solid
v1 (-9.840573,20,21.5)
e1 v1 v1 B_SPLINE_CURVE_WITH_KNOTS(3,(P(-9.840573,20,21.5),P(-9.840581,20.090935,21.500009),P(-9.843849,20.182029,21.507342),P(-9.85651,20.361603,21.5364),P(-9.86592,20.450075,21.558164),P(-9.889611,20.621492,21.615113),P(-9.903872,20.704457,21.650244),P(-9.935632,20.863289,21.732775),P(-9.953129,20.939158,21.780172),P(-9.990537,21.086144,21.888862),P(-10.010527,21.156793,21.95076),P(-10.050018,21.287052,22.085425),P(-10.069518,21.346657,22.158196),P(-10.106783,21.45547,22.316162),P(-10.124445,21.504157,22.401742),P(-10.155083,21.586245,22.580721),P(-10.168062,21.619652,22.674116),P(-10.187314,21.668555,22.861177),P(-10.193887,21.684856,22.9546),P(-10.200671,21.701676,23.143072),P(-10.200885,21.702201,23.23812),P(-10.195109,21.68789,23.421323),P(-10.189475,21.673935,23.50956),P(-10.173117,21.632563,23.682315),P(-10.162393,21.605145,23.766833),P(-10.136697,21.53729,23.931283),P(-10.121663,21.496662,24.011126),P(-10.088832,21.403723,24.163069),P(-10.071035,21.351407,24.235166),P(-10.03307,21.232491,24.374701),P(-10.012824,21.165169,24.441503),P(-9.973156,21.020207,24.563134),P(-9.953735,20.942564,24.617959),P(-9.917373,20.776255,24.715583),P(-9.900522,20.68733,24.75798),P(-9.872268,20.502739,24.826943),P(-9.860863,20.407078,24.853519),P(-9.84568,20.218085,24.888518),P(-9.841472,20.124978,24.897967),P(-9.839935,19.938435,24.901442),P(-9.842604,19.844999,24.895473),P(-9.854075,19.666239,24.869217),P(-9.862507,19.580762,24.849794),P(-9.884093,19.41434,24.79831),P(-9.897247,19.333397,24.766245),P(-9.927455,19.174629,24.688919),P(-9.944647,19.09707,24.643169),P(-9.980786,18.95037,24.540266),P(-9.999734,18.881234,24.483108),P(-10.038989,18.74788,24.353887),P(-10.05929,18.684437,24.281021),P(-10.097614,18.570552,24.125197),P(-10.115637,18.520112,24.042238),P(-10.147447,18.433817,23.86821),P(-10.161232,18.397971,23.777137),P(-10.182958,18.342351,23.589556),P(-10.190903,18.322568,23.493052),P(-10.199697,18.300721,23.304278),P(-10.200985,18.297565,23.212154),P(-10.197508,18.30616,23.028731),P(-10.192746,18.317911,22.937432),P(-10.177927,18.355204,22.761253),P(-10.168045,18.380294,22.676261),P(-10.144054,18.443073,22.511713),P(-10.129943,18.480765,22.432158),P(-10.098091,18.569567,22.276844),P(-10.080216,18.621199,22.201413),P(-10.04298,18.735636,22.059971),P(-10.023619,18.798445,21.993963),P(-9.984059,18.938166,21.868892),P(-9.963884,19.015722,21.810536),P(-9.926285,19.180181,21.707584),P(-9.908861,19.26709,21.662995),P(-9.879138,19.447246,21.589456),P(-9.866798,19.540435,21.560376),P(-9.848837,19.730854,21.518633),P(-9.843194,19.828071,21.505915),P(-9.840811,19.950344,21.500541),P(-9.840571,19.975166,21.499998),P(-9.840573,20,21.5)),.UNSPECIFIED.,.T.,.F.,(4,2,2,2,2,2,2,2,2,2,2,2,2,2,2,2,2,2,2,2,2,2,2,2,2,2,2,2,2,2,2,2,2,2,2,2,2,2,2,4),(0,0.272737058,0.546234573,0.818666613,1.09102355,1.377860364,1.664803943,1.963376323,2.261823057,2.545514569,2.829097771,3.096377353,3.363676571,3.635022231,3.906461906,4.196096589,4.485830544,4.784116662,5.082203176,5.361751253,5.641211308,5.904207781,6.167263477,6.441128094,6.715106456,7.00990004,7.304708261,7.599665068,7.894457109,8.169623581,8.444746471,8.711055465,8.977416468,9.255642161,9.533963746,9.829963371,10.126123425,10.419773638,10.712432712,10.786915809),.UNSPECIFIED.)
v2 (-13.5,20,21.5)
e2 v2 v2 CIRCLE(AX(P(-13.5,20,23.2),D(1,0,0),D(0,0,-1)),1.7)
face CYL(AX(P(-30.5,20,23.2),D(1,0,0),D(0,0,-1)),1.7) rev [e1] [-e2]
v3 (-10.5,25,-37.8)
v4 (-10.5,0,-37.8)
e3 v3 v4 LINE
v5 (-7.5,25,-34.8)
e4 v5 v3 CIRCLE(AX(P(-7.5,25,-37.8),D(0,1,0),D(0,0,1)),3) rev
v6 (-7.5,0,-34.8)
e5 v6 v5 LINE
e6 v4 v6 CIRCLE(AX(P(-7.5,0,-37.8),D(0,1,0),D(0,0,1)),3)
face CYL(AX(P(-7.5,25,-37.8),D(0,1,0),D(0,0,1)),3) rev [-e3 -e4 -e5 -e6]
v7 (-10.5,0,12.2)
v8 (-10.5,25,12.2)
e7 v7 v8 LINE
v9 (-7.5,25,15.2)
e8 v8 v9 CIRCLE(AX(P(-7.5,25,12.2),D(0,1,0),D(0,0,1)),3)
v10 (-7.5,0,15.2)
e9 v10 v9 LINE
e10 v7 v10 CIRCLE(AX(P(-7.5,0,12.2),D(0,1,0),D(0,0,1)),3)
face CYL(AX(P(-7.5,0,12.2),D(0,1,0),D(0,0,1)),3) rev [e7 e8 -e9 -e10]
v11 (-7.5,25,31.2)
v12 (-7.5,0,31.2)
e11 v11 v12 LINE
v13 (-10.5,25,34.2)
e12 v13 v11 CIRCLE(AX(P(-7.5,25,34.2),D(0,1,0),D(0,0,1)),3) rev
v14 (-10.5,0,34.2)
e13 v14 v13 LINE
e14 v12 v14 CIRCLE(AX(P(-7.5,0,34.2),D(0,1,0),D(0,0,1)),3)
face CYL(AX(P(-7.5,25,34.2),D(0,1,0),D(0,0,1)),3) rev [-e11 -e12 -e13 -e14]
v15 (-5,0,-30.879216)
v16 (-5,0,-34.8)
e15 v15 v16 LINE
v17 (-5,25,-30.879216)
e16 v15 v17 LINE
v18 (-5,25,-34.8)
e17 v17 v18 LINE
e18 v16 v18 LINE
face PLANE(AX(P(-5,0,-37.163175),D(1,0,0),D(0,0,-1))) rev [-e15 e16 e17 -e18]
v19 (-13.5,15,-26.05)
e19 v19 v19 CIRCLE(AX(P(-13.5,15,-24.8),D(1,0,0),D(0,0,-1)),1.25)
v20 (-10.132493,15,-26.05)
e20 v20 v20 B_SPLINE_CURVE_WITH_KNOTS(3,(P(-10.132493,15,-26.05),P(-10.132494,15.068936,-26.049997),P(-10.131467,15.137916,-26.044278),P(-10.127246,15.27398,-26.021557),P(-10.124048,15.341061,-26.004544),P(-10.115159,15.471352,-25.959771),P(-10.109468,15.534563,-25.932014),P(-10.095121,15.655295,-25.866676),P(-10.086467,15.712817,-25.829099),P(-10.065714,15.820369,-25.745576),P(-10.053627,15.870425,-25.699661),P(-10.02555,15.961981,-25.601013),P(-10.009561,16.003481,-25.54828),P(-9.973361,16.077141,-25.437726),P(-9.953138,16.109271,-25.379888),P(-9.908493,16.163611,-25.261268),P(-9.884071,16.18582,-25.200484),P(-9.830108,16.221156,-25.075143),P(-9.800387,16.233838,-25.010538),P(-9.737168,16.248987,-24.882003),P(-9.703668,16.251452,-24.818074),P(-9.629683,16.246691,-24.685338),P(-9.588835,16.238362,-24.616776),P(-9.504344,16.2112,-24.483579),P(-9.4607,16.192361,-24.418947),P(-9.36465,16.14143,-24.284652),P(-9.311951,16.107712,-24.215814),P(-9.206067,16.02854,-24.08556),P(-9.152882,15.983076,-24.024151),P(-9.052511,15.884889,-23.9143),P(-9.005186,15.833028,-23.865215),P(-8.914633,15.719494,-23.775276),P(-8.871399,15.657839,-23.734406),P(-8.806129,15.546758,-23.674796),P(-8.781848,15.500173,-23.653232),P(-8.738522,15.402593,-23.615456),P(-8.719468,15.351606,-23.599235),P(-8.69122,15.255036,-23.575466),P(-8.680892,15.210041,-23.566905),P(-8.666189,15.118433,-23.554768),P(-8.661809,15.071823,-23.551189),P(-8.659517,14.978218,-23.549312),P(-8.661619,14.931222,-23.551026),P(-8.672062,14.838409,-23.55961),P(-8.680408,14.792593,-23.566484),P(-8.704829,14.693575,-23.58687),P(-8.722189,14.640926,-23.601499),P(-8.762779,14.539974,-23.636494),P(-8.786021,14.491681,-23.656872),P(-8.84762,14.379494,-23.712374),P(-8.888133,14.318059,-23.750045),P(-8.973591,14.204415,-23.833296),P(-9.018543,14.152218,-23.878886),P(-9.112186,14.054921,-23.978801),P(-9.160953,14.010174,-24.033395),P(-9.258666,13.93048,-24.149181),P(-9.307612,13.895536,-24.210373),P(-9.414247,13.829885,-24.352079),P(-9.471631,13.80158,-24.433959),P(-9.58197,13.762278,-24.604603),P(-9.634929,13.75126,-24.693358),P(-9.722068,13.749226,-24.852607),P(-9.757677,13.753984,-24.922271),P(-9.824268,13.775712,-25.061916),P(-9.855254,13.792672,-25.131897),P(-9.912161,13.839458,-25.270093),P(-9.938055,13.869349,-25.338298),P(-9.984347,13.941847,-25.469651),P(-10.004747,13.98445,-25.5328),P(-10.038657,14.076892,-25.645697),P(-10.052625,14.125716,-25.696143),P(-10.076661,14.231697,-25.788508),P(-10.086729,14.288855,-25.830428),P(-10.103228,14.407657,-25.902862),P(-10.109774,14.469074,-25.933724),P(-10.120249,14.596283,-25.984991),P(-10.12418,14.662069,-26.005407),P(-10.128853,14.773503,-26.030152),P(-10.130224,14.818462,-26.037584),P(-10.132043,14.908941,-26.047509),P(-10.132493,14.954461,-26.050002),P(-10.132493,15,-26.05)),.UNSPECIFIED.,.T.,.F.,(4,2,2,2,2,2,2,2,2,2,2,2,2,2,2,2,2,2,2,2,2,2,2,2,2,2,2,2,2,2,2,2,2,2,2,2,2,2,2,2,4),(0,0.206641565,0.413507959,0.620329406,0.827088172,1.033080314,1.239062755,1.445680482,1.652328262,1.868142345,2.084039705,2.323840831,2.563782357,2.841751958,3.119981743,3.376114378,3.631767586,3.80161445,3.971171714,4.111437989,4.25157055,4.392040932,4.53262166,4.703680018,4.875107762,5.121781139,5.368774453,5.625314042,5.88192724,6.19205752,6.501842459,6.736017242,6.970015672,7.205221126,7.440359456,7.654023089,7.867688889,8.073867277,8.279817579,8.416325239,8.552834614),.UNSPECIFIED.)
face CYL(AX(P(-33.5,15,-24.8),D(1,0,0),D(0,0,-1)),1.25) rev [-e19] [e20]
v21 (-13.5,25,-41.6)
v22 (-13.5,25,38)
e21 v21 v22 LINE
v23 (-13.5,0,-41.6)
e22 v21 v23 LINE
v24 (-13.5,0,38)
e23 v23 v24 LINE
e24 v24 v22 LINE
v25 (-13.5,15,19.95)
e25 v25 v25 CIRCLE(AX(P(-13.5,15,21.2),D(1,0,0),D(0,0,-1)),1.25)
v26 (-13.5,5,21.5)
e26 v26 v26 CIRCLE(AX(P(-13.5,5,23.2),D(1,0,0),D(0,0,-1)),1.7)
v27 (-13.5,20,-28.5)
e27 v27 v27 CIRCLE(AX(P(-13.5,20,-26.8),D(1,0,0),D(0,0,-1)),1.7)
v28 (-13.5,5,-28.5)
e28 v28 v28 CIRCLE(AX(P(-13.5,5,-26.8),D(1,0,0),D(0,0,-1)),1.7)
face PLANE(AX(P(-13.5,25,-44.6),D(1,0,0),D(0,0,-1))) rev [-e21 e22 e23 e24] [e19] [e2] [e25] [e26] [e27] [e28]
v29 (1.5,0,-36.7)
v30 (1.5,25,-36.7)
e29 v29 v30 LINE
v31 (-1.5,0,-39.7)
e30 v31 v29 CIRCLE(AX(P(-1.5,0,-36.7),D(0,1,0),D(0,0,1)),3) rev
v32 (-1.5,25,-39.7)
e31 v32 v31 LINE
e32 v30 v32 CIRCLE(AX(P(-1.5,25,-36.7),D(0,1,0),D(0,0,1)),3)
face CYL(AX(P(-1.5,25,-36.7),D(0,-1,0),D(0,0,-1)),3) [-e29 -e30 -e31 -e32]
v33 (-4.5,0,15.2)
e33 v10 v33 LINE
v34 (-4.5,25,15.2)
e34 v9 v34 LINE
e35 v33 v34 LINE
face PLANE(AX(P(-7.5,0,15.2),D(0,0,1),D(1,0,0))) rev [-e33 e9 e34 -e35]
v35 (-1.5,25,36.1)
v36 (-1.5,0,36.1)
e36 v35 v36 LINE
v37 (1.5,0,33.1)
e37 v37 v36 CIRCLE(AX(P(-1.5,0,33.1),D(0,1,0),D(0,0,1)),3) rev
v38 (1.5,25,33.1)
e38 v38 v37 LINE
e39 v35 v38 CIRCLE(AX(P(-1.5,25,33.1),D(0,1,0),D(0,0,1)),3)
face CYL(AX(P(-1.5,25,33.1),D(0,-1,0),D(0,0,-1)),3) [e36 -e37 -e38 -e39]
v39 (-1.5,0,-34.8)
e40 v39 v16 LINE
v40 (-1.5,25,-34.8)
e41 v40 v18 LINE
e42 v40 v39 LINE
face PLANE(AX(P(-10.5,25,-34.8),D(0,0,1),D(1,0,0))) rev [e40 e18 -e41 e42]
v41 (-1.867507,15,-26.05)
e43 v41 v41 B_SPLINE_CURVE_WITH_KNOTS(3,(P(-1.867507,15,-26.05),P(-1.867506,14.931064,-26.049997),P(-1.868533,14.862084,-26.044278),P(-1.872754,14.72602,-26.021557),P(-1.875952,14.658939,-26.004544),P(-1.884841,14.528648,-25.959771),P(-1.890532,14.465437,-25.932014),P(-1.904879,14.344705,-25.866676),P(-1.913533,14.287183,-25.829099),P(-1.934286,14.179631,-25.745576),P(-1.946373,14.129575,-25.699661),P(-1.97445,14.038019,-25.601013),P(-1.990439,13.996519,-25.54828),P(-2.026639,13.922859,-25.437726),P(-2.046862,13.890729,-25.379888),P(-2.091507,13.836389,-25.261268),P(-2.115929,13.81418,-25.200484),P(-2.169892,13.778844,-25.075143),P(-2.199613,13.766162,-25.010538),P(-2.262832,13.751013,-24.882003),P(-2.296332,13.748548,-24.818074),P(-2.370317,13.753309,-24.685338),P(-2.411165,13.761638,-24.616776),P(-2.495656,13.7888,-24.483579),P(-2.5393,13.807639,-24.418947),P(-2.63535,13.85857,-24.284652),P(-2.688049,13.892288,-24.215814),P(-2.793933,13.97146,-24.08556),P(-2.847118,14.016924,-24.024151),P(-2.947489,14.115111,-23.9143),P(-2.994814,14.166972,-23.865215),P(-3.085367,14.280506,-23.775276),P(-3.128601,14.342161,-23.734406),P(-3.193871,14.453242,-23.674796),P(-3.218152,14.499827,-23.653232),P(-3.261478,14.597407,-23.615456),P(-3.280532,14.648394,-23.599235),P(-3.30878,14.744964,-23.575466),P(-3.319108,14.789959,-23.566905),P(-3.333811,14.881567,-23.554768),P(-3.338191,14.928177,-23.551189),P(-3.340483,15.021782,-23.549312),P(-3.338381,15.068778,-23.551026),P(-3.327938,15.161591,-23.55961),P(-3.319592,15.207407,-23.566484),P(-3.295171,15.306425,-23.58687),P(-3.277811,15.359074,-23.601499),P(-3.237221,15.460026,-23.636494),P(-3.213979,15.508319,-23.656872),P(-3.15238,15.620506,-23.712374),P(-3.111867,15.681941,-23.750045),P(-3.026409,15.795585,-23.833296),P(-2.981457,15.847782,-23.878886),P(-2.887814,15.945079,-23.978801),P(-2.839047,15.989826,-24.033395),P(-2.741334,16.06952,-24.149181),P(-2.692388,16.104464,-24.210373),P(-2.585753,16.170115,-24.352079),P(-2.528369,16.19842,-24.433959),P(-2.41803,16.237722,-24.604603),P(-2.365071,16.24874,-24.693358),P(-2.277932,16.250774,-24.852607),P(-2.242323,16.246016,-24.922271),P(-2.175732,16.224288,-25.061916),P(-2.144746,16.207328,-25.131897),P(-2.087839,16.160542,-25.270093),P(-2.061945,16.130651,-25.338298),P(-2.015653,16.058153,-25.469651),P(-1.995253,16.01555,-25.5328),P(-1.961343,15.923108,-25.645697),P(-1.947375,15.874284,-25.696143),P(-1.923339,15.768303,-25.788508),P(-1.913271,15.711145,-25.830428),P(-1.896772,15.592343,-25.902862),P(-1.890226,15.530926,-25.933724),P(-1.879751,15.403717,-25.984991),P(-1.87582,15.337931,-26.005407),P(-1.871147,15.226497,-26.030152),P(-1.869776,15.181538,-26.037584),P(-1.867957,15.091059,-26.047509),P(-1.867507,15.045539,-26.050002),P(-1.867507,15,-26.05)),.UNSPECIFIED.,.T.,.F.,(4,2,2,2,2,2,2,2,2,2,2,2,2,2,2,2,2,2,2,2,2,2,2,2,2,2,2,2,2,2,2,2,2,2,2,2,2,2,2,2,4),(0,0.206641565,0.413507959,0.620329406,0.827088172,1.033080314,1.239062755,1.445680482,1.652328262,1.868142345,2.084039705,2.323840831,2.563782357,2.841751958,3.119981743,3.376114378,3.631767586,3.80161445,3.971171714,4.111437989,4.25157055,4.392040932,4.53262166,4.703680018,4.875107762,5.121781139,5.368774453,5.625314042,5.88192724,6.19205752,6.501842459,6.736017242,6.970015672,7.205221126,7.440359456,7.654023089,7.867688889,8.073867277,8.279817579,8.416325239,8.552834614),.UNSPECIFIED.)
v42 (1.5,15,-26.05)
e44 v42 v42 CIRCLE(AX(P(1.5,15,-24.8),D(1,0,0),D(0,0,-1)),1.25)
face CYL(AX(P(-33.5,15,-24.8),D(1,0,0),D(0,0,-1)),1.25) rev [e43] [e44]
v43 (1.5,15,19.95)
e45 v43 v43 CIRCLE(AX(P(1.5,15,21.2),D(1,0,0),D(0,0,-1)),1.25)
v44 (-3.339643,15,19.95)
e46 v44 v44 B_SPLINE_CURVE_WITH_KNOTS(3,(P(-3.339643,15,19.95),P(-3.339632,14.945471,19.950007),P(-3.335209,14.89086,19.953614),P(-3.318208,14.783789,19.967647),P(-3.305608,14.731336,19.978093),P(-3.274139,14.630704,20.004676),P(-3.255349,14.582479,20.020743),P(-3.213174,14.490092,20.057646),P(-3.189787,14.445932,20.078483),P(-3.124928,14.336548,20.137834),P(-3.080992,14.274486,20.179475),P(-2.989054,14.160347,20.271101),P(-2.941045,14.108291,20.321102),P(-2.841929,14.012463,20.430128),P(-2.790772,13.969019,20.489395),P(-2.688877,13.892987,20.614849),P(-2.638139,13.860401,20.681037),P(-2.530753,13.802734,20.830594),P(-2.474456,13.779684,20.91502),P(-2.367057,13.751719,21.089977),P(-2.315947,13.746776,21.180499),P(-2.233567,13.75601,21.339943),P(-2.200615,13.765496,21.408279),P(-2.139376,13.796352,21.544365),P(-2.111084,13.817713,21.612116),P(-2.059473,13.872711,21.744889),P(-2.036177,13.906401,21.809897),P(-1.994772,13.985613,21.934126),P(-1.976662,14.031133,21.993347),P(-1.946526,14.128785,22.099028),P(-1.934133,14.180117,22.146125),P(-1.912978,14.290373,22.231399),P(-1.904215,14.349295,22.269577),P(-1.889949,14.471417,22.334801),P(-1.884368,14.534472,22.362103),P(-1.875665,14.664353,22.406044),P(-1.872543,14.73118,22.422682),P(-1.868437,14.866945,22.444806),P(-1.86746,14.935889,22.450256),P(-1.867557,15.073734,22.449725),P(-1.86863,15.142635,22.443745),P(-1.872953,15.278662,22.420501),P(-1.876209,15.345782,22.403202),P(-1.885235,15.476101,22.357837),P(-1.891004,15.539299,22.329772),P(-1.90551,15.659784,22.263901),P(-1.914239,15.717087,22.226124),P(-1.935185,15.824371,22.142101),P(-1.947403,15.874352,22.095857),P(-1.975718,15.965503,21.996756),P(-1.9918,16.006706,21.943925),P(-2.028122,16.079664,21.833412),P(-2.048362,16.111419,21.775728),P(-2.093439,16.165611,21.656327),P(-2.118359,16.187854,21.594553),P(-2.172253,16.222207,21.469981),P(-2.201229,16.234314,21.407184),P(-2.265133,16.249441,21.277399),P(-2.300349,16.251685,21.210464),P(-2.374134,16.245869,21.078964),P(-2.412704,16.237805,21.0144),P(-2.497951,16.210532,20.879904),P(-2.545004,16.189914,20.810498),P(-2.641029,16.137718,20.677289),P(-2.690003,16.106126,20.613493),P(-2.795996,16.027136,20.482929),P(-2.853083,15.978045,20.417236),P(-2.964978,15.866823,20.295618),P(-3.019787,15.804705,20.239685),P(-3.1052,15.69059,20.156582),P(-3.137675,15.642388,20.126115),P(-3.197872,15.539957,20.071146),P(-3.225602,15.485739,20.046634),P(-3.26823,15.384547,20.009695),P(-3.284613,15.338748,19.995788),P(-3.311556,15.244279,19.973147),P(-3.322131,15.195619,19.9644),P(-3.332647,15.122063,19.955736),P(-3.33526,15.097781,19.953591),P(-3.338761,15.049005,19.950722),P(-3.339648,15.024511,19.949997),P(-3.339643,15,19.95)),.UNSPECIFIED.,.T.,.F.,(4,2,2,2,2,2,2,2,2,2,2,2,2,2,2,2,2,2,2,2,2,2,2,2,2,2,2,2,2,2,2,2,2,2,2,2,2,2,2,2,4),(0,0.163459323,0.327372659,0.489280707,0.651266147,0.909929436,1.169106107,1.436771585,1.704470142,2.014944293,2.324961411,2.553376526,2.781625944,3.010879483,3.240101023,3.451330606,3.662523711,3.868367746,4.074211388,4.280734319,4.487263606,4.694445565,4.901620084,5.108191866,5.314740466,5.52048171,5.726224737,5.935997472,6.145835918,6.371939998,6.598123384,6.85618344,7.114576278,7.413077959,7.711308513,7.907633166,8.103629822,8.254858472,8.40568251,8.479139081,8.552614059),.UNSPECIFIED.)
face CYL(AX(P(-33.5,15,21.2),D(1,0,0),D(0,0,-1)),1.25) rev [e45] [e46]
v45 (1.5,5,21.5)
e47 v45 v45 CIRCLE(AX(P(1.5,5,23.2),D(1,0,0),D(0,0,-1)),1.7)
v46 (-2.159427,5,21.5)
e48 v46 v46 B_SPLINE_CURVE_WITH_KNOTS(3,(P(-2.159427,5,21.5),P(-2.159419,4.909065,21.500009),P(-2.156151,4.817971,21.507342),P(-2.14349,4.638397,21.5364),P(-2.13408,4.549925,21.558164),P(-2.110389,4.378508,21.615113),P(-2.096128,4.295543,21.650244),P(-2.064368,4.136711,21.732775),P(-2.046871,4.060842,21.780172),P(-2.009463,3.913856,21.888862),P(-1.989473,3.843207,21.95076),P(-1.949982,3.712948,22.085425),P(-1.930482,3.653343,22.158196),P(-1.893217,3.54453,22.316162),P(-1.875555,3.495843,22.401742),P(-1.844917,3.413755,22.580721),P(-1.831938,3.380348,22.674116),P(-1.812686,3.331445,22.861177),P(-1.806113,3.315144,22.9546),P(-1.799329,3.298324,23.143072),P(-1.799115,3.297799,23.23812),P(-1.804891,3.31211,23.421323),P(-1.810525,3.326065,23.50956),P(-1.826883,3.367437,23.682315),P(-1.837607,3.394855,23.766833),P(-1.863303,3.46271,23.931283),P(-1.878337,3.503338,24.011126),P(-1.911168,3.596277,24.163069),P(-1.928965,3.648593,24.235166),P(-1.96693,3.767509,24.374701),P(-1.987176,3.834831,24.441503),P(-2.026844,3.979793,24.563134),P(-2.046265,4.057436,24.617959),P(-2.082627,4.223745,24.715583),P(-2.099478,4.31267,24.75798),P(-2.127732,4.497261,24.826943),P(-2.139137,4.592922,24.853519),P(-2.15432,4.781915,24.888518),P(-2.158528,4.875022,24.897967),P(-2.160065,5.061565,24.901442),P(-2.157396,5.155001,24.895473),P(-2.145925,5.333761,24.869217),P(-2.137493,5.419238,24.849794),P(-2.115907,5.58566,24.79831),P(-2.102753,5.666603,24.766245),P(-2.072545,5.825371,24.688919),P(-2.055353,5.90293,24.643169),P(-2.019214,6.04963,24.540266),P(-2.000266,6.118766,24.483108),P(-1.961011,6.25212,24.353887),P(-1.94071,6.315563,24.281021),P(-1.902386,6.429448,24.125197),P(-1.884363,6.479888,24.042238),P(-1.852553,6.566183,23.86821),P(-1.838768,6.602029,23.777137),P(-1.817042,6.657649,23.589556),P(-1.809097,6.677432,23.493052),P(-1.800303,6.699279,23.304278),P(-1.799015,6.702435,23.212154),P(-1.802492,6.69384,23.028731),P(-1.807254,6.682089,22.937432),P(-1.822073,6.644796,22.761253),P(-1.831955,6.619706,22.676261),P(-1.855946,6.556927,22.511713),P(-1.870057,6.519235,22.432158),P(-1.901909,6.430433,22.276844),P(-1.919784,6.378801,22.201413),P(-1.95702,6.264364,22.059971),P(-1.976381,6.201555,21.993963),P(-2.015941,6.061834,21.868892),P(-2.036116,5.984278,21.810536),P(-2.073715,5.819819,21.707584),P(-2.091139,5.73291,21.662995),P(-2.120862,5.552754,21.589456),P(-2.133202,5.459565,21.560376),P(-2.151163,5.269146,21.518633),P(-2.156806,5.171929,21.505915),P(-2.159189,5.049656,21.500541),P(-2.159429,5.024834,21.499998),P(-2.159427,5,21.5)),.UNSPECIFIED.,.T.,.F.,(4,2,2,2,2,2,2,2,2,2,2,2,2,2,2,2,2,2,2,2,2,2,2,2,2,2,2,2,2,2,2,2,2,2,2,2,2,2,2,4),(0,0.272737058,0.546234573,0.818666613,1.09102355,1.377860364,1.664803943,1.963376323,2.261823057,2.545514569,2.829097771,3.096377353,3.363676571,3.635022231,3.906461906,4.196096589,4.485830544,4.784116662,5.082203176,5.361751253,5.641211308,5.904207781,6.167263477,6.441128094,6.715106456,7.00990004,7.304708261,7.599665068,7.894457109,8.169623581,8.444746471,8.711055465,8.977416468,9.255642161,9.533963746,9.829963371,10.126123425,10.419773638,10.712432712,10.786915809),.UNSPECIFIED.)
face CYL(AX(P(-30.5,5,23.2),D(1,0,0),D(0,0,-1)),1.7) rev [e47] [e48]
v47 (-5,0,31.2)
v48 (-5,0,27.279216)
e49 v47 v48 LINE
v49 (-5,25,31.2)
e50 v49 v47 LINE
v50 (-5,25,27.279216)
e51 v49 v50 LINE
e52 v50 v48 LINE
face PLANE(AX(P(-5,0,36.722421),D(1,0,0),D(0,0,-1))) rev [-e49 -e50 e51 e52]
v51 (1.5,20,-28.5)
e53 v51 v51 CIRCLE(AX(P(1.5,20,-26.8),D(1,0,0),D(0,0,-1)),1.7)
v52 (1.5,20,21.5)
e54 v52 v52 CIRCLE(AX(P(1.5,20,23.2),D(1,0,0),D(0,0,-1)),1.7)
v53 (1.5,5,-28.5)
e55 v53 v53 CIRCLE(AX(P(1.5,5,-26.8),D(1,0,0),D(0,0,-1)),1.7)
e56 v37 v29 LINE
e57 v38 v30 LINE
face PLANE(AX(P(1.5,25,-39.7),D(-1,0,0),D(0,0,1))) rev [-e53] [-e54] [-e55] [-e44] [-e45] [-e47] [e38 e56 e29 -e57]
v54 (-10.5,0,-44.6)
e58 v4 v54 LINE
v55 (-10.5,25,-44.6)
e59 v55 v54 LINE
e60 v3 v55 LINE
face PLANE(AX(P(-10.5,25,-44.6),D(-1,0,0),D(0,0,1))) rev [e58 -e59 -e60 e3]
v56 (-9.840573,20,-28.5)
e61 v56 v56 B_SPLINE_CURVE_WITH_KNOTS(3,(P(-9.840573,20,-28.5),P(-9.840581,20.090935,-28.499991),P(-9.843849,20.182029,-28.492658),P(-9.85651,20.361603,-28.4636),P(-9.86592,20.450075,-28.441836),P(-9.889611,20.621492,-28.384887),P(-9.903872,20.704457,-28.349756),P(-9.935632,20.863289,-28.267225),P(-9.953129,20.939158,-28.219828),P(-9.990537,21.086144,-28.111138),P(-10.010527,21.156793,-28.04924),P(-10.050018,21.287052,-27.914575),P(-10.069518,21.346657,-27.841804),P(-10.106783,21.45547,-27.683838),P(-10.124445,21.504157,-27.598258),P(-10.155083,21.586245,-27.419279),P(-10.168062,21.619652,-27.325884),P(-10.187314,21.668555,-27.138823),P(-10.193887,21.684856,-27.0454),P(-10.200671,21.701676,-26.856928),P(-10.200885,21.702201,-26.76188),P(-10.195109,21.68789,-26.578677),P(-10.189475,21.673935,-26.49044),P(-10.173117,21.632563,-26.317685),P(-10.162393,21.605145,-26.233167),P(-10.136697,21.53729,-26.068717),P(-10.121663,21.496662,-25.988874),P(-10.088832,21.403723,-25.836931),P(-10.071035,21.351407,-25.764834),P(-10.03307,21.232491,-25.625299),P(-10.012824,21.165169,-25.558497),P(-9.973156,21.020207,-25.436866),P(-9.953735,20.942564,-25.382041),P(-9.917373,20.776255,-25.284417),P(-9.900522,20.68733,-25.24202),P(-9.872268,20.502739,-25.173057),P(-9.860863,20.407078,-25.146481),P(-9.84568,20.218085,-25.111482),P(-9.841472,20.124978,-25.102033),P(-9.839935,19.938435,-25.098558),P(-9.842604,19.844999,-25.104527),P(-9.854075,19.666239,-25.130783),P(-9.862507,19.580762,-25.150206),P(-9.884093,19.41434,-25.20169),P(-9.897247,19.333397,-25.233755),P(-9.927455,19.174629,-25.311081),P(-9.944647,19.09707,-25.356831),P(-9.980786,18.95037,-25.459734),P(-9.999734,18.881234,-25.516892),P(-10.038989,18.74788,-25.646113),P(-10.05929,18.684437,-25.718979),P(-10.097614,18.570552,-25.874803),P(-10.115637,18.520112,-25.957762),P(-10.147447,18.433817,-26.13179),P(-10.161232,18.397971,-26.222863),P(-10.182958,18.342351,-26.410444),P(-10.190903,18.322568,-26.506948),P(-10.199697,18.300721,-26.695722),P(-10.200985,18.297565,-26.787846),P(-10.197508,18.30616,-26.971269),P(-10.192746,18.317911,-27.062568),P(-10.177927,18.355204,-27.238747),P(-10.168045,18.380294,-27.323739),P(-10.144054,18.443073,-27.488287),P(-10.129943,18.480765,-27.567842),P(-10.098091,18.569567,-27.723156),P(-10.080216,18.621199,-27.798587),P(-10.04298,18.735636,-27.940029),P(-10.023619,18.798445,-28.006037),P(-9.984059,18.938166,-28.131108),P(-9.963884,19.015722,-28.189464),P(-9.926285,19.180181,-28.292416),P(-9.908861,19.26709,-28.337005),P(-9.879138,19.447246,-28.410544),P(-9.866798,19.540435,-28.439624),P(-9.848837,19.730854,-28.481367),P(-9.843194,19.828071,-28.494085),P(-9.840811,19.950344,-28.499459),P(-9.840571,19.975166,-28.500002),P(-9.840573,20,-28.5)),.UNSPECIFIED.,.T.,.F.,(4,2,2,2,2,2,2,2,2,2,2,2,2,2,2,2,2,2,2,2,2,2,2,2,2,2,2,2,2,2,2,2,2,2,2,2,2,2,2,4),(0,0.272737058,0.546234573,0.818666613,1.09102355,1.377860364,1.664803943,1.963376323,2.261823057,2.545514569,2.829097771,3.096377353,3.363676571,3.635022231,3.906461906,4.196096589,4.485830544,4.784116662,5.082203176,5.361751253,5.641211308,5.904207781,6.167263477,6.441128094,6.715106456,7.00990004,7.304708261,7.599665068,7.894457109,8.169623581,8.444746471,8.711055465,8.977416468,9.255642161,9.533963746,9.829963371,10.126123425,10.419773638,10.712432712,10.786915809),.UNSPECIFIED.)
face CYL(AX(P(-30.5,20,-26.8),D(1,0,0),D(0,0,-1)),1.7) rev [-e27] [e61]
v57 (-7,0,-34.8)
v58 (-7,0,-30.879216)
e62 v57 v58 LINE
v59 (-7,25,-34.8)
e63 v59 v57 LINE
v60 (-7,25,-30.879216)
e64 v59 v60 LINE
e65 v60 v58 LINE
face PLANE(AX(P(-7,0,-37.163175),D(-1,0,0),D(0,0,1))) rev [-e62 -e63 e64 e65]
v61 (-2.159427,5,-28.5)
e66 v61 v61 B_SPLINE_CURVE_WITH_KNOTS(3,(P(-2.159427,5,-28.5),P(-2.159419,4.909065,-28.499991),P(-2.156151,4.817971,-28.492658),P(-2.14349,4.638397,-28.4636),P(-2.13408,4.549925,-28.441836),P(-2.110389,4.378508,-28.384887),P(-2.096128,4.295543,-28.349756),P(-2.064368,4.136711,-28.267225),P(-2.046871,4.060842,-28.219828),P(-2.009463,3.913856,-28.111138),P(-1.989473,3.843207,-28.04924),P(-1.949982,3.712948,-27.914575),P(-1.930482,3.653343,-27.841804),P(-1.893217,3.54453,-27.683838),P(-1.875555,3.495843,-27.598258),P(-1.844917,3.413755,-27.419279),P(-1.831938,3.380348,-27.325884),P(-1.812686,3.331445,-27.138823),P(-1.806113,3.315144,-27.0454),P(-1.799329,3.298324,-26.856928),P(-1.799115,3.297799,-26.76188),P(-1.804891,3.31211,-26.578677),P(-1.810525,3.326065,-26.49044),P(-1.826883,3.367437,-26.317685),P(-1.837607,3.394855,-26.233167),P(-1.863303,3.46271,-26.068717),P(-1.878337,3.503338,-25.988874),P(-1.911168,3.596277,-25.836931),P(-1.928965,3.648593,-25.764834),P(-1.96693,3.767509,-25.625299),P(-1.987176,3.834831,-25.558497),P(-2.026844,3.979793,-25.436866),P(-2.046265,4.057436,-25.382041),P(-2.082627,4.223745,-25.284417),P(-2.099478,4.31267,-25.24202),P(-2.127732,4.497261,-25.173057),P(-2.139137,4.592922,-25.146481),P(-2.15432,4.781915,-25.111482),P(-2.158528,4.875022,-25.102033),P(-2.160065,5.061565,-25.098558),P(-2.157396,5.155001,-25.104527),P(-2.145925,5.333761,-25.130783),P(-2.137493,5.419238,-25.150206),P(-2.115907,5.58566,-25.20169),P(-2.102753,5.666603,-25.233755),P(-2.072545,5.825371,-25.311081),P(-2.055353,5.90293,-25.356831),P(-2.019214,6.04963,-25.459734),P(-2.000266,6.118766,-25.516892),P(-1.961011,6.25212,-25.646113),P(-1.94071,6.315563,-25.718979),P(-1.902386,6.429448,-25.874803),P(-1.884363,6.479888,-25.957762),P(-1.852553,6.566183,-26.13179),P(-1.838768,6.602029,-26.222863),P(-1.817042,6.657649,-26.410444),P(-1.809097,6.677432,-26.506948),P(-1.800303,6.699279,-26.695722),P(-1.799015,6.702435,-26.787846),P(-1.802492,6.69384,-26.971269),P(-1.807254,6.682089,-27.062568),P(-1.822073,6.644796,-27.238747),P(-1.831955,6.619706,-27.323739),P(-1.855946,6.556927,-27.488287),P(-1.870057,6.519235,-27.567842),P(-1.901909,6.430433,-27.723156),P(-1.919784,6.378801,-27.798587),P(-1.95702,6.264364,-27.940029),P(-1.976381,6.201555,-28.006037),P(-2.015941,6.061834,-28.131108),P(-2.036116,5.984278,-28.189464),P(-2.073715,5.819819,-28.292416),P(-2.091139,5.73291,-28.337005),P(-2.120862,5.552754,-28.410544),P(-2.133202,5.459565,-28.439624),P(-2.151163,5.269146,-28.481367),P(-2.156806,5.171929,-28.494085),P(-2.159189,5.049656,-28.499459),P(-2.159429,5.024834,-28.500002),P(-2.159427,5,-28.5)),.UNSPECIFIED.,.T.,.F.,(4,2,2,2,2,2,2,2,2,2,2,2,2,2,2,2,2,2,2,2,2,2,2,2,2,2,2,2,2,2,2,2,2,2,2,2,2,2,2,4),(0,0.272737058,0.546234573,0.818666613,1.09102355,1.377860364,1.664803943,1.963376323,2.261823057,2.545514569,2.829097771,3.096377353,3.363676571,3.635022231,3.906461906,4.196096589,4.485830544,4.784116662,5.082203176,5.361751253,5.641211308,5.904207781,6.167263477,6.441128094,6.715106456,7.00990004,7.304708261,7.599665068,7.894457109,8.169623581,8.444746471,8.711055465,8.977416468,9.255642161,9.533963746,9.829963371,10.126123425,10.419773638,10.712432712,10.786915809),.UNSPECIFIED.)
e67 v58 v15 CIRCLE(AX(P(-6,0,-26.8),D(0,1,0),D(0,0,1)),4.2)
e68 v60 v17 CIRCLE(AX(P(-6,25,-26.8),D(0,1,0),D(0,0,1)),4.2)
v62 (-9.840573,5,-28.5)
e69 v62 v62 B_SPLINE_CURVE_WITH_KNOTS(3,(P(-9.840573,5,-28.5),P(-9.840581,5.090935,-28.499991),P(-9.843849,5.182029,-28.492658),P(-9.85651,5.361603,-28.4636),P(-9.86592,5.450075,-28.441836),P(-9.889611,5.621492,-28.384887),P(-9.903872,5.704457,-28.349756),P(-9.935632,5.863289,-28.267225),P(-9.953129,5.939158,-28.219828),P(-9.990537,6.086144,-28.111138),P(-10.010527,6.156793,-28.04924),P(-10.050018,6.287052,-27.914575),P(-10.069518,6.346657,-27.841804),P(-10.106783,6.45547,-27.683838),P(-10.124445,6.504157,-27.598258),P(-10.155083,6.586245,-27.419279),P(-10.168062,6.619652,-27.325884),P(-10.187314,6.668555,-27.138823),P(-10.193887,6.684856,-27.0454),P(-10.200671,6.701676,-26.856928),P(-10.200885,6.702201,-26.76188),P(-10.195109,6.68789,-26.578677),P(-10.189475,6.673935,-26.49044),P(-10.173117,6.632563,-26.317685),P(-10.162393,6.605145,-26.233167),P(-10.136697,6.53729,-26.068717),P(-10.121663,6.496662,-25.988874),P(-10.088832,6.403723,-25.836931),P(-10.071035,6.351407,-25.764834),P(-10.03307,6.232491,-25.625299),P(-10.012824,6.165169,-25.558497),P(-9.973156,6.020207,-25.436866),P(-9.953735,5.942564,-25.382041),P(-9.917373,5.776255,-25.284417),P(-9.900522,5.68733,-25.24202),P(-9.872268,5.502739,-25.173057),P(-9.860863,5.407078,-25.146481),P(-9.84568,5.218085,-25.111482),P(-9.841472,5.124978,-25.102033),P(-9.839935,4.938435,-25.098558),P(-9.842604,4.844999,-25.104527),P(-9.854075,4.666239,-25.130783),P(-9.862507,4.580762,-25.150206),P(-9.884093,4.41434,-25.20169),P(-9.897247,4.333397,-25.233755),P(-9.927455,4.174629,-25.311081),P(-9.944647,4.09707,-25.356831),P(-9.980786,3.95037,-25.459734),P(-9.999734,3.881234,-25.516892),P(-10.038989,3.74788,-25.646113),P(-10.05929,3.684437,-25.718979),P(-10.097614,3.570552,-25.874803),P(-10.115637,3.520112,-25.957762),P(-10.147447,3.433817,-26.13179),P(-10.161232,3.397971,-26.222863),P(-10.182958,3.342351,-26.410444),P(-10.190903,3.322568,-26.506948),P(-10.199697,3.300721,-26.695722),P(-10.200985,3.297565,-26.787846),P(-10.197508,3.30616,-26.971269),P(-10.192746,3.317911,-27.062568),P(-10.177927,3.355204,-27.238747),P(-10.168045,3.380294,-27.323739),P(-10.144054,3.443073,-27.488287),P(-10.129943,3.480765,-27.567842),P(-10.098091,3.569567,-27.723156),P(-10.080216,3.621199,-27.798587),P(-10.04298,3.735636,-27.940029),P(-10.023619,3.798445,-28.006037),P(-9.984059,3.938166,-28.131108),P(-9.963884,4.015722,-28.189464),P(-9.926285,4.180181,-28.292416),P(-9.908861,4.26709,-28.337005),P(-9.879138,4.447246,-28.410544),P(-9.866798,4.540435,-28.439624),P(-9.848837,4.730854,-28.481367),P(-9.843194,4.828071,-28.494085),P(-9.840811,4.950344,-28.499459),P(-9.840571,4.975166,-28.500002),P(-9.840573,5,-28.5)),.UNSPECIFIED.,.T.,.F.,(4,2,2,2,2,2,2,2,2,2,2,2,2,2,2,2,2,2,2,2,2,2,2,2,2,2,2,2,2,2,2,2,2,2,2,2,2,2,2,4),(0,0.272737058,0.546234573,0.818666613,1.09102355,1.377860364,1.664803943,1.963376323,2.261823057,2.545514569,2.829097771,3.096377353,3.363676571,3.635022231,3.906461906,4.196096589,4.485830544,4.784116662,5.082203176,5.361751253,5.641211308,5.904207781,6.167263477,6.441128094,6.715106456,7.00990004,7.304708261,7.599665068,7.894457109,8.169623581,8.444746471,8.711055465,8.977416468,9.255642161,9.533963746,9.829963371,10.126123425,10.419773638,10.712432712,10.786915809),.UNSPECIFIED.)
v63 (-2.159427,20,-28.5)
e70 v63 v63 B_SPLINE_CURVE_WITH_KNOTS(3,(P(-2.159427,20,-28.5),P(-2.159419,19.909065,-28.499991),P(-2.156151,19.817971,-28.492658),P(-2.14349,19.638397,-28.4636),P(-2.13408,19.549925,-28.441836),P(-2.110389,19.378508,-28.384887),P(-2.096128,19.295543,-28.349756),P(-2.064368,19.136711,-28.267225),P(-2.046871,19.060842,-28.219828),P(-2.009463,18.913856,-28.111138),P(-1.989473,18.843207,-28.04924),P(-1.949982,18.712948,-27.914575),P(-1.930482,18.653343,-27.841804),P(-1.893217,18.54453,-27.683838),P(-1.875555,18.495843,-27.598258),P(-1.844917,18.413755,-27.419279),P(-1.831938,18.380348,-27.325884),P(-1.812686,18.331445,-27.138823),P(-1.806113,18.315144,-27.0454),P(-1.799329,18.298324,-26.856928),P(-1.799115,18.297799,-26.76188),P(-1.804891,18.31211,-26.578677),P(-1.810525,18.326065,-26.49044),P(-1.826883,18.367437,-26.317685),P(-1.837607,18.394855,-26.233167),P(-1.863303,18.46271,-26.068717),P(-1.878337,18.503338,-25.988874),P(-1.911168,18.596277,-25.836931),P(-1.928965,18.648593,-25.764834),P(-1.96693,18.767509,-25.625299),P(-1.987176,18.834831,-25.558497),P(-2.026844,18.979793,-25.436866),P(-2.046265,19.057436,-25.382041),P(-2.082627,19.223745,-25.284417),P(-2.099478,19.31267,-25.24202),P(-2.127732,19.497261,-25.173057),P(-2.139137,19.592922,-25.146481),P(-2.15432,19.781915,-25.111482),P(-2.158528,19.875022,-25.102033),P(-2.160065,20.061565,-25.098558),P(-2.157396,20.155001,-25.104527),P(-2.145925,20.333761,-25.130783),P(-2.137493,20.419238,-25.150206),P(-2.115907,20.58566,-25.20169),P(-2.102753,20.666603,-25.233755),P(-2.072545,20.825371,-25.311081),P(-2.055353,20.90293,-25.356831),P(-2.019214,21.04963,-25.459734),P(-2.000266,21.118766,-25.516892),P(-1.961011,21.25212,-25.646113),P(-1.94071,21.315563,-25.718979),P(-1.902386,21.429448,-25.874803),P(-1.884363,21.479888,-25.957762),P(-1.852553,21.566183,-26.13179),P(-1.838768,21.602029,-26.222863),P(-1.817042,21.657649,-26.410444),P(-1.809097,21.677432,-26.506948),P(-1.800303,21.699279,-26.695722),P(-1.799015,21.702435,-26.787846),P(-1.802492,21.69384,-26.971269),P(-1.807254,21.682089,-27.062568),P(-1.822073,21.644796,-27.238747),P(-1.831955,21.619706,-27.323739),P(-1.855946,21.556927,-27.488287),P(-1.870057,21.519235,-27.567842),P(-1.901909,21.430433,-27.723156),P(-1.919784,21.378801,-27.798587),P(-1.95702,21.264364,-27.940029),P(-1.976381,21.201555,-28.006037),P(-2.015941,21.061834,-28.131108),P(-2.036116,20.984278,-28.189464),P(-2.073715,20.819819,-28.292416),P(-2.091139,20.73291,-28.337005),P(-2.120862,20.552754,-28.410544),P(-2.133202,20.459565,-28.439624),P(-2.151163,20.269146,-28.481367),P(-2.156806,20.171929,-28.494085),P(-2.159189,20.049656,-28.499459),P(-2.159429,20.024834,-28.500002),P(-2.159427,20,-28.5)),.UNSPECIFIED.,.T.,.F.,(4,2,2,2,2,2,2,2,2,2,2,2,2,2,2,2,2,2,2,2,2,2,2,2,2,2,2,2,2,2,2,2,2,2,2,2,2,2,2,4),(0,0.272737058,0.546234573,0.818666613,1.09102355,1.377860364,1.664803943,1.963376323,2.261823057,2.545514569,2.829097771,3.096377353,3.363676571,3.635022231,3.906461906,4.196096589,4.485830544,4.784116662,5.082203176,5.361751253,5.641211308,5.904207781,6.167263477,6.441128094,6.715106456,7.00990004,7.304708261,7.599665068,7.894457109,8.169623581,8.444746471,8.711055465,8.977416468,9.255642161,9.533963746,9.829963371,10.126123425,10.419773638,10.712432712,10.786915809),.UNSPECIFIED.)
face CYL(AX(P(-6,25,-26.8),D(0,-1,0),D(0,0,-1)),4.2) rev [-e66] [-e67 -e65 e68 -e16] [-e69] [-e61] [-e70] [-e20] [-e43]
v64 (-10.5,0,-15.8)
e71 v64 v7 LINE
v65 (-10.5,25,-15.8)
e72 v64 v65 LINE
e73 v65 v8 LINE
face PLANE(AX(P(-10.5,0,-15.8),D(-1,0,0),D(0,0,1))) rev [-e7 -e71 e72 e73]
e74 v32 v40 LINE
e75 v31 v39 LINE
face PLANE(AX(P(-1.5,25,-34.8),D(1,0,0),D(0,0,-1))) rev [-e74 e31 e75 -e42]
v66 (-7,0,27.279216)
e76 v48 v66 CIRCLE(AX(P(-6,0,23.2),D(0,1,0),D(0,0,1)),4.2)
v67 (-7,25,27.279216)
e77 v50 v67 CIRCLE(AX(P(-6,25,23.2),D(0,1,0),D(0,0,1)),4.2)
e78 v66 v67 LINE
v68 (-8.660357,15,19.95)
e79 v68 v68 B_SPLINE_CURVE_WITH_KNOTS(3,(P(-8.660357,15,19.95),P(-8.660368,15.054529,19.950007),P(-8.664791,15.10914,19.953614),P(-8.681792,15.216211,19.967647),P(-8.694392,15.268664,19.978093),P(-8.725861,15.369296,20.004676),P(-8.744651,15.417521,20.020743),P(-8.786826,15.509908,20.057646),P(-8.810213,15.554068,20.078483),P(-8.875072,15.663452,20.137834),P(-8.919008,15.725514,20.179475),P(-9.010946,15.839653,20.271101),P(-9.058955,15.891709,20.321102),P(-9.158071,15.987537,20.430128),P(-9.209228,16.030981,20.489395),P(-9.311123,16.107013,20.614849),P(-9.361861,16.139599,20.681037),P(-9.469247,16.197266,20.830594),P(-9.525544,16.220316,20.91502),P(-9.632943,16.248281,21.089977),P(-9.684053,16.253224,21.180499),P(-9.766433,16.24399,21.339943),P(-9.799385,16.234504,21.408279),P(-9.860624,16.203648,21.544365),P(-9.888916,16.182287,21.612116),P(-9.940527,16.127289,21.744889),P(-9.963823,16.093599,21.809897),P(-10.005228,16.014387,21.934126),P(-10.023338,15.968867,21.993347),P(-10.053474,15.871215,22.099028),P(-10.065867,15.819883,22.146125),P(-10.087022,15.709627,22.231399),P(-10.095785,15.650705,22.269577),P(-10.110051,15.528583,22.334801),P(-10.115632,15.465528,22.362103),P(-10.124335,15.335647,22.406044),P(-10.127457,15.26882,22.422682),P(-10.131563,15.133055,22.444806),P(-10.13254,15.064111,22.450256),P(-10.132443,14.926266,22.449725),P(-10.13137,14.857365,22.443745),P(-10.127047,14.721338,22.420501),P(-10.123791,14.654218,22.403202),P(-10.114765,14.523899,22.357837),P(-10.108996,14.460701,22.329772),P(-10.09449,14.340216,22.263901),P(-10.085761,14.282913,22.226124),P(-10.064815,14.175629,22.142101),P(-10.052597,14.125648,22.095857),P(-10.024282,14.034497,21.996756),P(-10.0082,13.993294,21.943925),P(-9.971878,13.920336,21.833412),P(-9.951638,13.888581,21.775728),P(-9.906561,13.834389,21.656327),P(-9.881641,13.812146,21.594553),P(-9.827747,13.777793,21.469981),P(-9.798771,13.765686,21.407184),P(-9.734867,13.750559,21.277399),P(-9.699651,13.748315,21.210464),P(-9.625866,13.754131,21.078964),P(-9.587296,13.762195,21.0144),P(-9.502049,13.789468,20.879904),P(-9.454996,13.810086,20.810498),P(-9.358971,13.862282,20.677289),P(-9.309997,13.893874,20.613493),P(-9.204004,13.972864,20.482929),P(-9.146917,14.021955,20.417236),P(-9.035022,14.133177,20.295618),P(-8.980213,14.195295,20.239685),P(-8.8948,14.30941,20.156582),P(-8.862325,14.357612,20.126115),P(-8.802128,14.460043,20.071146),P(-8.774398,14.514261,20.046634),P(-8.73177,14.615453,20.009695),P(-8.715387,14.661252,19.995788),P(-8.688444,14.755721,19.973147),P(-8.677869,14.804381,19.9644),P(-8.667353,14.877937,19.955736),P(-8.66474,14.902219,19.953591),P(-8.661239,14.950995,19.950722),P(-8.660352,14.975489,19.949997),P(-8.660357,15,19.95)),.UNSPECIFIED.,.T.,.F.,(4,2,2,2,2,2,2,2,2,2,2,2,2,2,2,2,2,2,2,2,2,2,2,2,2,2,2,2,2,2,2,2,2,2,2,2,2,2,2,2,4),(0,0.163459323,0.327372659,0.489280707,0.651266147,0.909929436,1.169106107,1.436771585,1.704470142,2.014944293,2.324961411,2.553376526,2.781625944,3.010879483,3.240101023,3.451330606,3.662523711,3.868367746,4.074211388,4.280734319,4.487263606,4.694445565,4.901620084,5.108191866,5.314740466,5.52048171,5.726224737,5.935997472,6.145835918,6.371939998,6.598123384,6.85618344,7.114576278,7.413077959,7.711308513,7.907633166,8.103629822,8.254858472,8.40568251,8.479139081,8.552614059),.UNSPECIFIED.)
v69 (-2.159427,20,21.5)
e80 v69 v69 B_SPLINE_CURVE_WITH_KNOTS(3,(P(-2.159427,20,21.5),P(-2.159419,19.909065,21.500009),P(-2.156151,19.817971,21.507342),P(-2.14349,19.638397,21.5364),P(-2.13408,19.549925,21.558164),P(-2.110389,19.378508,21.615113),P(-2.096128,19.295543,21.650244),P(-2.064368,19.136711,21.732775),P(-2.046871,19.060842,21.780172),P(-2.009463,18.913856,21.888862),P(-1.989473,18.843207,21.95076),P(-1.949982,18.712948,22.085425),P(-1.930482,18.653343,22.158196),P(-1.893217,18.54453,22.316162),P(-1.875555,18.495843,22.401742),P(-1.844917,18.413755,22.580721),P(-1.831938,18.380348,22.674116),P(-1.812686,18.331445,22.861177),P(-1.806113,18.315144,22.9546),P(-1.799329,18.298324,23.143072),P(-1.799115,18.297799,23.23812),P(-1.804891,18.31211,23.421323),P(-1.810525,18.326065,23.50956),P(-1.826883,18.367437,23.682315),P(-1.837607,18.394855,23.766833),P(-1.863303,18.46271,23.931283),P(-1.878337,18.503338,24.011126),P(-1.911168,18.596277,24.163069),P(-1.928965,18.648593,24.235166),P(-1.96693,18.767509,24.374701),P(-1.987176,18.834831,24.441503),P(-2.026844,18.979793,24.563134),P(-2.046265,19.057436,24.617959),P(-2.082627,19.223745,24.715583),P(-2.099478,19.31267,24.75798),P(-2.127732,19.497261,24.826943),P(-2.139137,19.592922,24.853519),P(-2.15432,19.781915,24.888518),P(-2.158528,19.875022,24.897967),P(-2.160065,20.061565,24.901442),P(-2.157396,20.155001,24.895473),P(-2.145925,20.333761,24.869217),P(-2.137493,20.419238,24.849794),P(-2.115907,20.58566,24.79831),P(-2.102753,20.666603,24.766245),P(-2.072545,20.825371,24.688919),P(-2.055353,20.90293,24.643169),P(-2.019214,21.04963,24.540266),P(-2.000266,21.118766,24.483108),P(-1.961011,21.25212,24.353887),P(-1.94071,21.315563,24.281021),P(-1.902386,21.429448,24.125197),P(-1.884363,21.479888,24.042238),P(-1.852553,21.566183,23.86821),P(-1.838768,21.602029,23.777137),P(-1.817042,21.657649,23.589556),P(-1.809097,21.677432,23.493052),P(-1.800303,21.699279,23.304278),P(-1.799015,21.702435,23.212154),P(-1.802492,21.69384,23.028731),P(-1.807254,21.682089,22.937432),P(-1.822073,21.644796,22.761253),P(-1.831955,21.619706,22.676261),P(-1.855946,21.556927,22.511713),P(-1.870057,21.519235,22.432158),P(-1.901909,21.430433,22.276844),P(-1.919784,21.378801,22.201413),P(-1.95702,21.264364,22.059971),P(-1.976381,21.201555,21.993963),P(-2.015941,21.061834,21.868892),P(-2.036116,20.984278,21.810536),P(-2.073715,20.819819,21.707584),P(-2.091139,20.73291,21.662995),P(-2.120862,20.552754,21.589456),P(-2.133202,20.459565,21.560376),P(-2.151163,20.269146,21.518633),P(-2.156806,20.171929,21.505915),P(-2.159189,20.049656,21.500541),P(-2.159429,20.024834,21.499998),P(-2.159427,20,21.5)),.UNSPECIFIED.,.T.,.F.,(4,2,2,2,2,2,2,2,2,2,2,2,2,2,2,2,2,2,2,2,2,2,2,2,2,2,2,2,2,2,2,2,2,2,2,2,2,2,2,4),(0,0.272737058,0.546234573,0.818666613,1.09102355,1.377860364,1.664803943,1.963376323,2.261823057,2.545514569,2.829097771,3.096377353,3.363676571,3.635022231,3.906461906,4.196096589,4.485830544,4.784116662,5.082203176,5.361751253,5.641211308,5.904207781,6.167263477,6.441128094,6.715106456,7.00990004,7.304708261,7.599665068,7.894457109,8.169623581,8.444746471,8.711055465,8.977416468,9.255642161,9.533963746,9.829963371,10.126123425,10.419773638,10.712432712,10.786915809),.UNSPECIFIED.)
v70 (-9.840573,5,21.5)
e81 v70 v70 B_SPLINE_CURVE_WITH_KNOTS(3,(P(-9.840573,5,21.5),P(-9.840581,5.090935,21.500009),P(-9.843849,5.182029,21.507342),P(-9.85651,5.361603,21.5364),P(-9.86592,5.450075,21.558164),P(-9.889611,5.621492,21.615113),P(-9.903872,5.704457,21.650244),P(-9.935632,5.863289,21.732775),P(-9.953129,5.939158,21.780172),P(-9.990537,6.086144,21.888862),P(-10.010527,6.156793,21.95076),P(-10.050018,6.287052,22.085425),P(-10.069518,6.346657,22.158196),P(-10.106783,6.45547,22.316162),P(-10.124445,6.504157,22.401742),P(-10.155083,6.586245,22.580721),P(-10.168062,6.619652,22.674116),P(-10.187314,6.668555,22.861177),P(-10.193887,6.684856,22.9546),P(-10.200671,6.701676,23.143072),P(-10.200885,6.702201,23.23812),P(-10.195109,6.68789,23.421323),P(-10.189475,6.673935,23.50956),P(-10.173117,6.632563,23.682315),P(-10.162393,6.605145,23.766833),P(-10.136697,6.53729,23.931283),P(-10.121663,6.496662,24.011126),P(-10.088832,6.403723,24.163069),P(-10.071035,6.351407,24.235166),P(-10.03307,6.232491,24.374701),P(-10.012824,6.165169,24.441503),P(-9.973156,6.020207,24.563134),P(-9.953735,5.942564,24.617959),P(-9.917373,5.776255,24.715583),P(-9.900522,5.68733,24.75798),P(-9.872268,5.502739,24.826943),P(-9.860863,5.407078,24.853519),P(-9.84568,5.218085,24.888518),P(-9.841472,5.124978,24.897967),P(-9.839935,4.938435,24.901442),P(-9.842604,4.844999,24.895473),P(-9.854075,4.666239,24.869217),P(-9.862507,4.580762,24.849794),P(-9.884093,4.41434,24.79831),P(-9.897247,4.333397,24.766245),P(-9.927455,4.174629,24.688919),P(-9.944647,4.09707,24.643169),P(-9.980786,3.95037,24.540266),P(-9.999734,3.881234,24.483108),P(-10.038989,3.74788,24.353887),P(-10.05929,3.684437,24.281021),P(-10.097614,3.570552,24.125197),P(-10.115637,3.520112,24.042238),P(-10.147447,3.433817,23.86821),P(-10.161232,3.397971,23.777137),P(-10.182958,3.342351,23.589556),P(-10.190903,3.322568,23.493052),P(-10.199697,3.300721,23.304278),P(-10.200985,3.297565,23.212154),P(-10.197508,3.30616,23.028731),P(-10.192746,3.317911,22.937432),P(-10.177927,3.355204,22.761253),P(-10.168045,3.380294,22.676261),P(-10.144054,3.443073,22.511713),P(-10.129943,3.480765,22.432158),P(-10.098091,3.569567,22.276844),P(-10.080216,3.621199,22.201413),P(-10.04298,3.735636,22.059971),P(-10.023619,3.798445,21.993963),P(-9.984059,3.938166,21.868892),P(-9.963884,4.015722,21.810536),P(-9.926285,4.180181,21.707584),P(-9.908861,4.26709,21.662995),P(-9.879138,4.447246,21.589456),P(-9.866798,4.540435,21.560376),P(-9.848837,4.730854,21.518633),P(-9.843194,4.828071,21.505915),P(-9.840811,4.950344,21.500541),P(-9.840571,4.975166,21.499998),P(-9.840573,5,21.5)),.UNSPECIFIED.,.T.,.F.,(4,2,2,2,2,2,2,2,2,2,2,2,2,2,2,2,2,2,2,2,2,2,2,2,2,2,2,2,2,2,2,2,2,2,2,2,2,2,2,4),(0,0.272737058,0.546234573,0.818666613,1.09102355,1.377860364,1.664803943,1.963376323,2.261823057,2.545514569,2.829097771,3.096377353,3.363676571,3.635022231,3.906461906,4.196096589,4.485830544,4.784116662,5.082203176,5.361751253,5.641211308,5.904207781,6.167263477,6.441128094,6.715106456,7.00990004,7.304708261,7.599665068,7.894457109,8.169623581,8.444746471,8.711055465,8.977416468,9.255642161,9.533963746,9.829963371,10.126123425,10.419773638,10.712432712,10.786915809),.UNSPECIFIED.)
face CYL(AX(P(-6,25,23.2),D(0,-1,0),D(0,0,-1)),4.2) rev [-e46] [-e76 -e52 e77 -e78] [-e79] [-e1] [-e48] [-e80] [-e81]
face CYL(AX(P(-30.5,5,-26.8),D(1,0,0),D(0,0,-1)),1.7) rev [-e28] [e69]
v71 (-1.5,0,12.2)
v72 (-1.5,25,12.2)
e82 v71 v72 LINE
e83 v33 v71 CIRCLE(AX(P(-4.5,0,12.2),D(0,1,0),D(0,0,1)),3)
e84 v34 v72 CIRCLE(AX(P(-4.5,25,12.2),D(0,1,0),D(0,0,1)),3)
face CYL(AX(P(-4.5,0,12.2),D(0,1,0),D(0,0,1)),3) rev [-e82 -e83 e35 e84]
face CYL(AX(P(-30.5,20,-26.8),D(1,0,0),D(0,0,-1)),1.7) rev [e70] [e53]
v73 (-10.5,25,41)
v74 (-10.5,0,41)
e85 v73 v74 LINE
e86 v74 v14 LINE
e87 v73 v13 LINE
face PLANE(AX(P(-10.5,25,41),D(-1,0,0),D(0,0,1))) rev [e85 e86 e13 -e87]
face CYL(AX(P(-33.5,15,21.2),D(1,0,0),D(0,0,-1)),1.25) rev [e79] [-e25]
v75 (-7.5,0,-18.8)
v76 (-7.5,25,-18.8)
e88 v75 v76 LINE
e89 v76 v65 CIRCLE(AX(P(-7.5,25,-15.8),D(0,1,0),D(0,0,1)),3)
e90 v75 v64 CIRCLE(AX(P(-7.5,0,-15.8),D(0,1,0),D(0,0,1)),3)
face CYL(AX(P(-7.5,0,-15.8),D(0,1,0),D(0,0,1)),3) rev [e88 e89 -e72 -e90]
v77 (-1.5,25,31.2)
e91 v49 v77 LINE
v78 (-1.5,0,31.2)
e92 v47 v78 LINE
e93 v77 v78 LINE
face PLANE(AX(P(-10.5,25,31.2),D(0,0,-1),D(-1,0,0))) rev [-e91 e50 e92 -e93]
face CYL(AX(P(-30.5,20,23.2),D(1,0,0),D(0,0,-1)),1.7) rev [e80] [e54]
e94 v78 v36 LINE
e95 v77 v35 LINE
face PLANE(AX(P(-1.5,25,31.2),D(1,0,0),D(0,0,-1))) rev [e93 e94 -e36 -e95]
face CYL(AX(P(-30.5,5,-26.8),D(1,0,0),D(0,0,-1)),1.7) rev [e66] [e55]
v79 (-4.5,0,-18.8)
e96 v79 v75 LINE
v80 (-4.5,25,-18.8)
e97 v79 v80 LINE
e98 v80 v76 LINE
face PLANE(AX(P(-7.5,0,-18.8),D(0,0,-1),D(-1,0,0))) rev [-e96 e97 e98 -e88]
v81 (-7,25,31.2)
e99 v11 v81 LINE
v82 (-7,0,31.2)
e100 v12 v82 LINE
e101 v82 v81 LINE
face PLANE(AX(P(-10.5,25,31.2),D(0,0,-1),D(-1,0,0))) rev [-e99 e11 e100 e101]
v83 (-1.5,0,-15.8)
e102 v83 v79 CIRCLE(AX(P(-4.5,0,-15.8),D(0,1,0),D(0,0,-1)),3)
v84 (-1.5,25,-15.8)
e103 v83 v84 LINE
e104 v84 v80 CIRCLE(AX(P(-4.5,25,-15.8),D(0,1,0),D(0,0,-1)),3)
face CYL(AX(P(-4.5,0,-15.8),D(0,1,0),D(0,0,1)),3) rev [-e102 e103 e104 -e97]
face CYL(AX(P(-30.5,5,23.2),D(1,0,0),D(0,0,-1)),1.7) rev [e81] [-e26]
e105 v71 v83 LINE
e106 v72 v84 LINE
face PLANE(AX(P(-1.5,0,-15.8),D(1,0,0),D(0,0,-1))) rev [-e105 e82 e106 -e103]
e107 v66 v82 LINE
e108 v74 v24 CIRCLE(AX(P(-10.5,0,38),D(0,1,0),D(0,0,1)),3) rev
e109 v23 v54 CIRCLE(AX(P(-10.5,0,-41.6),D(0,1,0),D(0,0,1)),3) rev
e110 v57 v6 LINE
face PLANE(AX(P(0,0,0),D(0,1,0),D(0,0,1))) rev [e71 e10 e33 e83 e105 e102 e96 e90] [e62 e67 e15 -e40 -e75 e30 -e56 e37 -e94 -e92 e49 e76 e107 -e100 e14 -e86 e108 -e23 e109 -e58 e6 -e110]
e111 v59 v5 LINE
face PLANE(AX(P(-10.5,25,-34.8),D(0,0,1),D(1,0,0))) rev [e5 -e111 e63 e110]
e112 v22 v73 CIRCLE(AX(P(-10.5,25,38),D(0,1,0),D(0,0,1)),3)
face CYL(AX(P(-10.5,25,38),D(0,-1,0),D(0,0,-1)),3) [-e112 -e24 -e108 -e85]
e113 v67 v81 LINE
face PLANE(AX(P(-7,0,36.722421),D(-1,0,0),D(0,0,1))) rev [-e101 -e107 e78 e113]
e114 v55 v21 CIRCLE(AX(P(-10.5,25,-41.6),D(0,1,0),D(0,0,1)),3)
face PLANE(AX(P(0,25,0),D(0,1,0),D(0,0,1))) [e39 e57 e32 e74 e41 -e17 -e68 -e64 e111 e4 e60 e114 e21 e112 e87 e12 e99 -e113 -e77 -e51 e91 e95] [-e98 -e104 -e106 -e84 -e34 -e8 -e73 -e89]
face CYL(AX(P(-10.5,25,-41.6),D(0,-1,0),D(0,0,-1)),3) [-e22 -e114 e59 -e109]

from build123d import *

# Parameters (mm, degrees)
SKETCH_2_R          = 4.2
EXTRUDE_1_DEPTH     = 25
FILLET_1_R          = 3
CUT_EXTRUDE_1_DEPTH = 25
SKETCH_4_W          = 2
SKETCH_4_H          = 9.772408651
SKETCH_4_H_2        = 10.02993421
CUT_EXTRUDE_2_DEPTH = 25
SKETCH_5_R          = 1.25
CUT_EXTRUDE_3_DEPTH = 35
SKETCH_6_R          = 1.7
CUT_EXTRUDE_4_DEPTH = 32


with BuildPart() as part:
    # 草图2 → 凸台-拉伸1 (new body)
    with BuildSketch(Plane(origin=(0, 0, 0), x_dir=(1, 0, 0), z_dir=(0, 1, 0))):
        Polygon((-10.5, 44.6), (-10.5, 34.8), (-1.5, 34.8), (-1.5, 39.7), (1.5, 39.7), (1.5, -36.1), (-1.5, -36.1), (-1.5, -31.2), (-10.5, -31.2), (-10.5, -41), (-13.5, -41), (-13.5, 44.6), align=None)
        with Locations(Location((-6, -23.2, 0), (0, 0, 270))):
            Circle(SKETCH_2_R, mode=Mode.SUBTRACT)
        with Locations(Location((-6, 26.8, 0), (0, 0, 270))):
            Circle(SKETCH_2_R, mode=Mode.SUBTRACT)
    extrude(amount=EXTRUDE_1_DEPTH)

    # 圆角1
    fillet_1_edges = [part.edges().sort_by_distance(p)[0] for p in [
        (1.5, 12.5, 36.1),
        (1.5, 12.5, -39.7),
        (-10.5, 12.5, -34.8),
        (-10.5, 12.5, 31.2),
        (-13.5, 12.5, -44.6),
        (-13.5, 12.5, 41),
    ]]
    fillet(fillet_1_edges, radius=FILLET_1_R - 0.0001)  # a hair under: the kernel refuses the full size

    # 草图3 → 切除-拉伸1 (cut)
    with BuildSketch(Plane(origin=(0, 25, 0), x_dir=(1, 0, 0), z_dir=(0, 1, 0))):
        with BuildLine():
            Line((-7.5, 18.8), (-4.5, 18.8))
            ThreePointArc((-4.5, 18.8), (-2.378679656, 17.921320344), (-1.5, 15.8))
            Line((-1.5, 15.8), (-1.5, -12.2))
            ThreePointArc((-1.5, -12.2), (-2.378679656, -14.321320344), (-4.5, -15.2))
            Line((-4.5, -15.2), (-7.5, -15.2))
            ThreePointArc((-7.5, -15.2), (-9.621320344, -14.321320344), (-10.5, -12.2))
            Line((-10.5, -12.2), (-10.5, 15.8))
            ThreePointArc((-10.5, 15.8), (-9.621320344, 17.921320344), (-7.5, 18.8))
        make_face()
    extrude(amount=-CUT_EXTRUDE_1_DEPTH, mode=Mode.SUBTRACT)

    # 草图4 → 切除-拉伸2 (cut)
    with BuildSketch(Plane(origin=(0, 25, 0), x_dir=(1, 0, 0), z_dir=(0, 1, 0))):
        with Locations((-6, -31.836216801)):
            Rectangle(SKETCH_4_W, SKETCH_4_H)
        with Locations((-6, 32.148208176)):
            Rectangle(SKETCH_4_W, SKETCH_4_H_2)
    extrude(amount=-CUT_EXTRUDE_2_DEPTH, mode=Mode.SUBTRACT)

    # 草图5 → 切除-拉伸3 (cut)
    with BuildSketch(Plane(origin=(1.5, 0, 0), x_dir=(0, 0, -1), z_dir=(1, 0, 0))):
        with Locations((-21.2, 15)):
            Circle(SKETCH_5_R)
        with Locations((24.8, 15)):
            Circle(SKETCH_5_R)
    extrude(amount=-CUT_EXTRUDE_3_DEPTH, mode=Mode.SUBTRACT)

    # 草图6 → 切除-拉伸4 (cut)
    with BuildSketch(Plane(origin=(1.5, 0, 0), x_dir=(0, 0, -1), z_dir=(1, 0, 0))):
        with Locations((26.8, 5)):
            Circle(SKETCH_6_R)
        with Locations((26.8, 20)):
            Circle(SKETCH_6_R)
        with Locations((-23.2, 5)):
            Circle(SKETCH_6_R)
        with Locations((-23.2, 20)):
            Circle(SKETCH_6_R)
    extrude(amount=-CUT_EXTRUDE_4_DEPTH, mode=Mode.SUBTRACT)


solid = part.part
